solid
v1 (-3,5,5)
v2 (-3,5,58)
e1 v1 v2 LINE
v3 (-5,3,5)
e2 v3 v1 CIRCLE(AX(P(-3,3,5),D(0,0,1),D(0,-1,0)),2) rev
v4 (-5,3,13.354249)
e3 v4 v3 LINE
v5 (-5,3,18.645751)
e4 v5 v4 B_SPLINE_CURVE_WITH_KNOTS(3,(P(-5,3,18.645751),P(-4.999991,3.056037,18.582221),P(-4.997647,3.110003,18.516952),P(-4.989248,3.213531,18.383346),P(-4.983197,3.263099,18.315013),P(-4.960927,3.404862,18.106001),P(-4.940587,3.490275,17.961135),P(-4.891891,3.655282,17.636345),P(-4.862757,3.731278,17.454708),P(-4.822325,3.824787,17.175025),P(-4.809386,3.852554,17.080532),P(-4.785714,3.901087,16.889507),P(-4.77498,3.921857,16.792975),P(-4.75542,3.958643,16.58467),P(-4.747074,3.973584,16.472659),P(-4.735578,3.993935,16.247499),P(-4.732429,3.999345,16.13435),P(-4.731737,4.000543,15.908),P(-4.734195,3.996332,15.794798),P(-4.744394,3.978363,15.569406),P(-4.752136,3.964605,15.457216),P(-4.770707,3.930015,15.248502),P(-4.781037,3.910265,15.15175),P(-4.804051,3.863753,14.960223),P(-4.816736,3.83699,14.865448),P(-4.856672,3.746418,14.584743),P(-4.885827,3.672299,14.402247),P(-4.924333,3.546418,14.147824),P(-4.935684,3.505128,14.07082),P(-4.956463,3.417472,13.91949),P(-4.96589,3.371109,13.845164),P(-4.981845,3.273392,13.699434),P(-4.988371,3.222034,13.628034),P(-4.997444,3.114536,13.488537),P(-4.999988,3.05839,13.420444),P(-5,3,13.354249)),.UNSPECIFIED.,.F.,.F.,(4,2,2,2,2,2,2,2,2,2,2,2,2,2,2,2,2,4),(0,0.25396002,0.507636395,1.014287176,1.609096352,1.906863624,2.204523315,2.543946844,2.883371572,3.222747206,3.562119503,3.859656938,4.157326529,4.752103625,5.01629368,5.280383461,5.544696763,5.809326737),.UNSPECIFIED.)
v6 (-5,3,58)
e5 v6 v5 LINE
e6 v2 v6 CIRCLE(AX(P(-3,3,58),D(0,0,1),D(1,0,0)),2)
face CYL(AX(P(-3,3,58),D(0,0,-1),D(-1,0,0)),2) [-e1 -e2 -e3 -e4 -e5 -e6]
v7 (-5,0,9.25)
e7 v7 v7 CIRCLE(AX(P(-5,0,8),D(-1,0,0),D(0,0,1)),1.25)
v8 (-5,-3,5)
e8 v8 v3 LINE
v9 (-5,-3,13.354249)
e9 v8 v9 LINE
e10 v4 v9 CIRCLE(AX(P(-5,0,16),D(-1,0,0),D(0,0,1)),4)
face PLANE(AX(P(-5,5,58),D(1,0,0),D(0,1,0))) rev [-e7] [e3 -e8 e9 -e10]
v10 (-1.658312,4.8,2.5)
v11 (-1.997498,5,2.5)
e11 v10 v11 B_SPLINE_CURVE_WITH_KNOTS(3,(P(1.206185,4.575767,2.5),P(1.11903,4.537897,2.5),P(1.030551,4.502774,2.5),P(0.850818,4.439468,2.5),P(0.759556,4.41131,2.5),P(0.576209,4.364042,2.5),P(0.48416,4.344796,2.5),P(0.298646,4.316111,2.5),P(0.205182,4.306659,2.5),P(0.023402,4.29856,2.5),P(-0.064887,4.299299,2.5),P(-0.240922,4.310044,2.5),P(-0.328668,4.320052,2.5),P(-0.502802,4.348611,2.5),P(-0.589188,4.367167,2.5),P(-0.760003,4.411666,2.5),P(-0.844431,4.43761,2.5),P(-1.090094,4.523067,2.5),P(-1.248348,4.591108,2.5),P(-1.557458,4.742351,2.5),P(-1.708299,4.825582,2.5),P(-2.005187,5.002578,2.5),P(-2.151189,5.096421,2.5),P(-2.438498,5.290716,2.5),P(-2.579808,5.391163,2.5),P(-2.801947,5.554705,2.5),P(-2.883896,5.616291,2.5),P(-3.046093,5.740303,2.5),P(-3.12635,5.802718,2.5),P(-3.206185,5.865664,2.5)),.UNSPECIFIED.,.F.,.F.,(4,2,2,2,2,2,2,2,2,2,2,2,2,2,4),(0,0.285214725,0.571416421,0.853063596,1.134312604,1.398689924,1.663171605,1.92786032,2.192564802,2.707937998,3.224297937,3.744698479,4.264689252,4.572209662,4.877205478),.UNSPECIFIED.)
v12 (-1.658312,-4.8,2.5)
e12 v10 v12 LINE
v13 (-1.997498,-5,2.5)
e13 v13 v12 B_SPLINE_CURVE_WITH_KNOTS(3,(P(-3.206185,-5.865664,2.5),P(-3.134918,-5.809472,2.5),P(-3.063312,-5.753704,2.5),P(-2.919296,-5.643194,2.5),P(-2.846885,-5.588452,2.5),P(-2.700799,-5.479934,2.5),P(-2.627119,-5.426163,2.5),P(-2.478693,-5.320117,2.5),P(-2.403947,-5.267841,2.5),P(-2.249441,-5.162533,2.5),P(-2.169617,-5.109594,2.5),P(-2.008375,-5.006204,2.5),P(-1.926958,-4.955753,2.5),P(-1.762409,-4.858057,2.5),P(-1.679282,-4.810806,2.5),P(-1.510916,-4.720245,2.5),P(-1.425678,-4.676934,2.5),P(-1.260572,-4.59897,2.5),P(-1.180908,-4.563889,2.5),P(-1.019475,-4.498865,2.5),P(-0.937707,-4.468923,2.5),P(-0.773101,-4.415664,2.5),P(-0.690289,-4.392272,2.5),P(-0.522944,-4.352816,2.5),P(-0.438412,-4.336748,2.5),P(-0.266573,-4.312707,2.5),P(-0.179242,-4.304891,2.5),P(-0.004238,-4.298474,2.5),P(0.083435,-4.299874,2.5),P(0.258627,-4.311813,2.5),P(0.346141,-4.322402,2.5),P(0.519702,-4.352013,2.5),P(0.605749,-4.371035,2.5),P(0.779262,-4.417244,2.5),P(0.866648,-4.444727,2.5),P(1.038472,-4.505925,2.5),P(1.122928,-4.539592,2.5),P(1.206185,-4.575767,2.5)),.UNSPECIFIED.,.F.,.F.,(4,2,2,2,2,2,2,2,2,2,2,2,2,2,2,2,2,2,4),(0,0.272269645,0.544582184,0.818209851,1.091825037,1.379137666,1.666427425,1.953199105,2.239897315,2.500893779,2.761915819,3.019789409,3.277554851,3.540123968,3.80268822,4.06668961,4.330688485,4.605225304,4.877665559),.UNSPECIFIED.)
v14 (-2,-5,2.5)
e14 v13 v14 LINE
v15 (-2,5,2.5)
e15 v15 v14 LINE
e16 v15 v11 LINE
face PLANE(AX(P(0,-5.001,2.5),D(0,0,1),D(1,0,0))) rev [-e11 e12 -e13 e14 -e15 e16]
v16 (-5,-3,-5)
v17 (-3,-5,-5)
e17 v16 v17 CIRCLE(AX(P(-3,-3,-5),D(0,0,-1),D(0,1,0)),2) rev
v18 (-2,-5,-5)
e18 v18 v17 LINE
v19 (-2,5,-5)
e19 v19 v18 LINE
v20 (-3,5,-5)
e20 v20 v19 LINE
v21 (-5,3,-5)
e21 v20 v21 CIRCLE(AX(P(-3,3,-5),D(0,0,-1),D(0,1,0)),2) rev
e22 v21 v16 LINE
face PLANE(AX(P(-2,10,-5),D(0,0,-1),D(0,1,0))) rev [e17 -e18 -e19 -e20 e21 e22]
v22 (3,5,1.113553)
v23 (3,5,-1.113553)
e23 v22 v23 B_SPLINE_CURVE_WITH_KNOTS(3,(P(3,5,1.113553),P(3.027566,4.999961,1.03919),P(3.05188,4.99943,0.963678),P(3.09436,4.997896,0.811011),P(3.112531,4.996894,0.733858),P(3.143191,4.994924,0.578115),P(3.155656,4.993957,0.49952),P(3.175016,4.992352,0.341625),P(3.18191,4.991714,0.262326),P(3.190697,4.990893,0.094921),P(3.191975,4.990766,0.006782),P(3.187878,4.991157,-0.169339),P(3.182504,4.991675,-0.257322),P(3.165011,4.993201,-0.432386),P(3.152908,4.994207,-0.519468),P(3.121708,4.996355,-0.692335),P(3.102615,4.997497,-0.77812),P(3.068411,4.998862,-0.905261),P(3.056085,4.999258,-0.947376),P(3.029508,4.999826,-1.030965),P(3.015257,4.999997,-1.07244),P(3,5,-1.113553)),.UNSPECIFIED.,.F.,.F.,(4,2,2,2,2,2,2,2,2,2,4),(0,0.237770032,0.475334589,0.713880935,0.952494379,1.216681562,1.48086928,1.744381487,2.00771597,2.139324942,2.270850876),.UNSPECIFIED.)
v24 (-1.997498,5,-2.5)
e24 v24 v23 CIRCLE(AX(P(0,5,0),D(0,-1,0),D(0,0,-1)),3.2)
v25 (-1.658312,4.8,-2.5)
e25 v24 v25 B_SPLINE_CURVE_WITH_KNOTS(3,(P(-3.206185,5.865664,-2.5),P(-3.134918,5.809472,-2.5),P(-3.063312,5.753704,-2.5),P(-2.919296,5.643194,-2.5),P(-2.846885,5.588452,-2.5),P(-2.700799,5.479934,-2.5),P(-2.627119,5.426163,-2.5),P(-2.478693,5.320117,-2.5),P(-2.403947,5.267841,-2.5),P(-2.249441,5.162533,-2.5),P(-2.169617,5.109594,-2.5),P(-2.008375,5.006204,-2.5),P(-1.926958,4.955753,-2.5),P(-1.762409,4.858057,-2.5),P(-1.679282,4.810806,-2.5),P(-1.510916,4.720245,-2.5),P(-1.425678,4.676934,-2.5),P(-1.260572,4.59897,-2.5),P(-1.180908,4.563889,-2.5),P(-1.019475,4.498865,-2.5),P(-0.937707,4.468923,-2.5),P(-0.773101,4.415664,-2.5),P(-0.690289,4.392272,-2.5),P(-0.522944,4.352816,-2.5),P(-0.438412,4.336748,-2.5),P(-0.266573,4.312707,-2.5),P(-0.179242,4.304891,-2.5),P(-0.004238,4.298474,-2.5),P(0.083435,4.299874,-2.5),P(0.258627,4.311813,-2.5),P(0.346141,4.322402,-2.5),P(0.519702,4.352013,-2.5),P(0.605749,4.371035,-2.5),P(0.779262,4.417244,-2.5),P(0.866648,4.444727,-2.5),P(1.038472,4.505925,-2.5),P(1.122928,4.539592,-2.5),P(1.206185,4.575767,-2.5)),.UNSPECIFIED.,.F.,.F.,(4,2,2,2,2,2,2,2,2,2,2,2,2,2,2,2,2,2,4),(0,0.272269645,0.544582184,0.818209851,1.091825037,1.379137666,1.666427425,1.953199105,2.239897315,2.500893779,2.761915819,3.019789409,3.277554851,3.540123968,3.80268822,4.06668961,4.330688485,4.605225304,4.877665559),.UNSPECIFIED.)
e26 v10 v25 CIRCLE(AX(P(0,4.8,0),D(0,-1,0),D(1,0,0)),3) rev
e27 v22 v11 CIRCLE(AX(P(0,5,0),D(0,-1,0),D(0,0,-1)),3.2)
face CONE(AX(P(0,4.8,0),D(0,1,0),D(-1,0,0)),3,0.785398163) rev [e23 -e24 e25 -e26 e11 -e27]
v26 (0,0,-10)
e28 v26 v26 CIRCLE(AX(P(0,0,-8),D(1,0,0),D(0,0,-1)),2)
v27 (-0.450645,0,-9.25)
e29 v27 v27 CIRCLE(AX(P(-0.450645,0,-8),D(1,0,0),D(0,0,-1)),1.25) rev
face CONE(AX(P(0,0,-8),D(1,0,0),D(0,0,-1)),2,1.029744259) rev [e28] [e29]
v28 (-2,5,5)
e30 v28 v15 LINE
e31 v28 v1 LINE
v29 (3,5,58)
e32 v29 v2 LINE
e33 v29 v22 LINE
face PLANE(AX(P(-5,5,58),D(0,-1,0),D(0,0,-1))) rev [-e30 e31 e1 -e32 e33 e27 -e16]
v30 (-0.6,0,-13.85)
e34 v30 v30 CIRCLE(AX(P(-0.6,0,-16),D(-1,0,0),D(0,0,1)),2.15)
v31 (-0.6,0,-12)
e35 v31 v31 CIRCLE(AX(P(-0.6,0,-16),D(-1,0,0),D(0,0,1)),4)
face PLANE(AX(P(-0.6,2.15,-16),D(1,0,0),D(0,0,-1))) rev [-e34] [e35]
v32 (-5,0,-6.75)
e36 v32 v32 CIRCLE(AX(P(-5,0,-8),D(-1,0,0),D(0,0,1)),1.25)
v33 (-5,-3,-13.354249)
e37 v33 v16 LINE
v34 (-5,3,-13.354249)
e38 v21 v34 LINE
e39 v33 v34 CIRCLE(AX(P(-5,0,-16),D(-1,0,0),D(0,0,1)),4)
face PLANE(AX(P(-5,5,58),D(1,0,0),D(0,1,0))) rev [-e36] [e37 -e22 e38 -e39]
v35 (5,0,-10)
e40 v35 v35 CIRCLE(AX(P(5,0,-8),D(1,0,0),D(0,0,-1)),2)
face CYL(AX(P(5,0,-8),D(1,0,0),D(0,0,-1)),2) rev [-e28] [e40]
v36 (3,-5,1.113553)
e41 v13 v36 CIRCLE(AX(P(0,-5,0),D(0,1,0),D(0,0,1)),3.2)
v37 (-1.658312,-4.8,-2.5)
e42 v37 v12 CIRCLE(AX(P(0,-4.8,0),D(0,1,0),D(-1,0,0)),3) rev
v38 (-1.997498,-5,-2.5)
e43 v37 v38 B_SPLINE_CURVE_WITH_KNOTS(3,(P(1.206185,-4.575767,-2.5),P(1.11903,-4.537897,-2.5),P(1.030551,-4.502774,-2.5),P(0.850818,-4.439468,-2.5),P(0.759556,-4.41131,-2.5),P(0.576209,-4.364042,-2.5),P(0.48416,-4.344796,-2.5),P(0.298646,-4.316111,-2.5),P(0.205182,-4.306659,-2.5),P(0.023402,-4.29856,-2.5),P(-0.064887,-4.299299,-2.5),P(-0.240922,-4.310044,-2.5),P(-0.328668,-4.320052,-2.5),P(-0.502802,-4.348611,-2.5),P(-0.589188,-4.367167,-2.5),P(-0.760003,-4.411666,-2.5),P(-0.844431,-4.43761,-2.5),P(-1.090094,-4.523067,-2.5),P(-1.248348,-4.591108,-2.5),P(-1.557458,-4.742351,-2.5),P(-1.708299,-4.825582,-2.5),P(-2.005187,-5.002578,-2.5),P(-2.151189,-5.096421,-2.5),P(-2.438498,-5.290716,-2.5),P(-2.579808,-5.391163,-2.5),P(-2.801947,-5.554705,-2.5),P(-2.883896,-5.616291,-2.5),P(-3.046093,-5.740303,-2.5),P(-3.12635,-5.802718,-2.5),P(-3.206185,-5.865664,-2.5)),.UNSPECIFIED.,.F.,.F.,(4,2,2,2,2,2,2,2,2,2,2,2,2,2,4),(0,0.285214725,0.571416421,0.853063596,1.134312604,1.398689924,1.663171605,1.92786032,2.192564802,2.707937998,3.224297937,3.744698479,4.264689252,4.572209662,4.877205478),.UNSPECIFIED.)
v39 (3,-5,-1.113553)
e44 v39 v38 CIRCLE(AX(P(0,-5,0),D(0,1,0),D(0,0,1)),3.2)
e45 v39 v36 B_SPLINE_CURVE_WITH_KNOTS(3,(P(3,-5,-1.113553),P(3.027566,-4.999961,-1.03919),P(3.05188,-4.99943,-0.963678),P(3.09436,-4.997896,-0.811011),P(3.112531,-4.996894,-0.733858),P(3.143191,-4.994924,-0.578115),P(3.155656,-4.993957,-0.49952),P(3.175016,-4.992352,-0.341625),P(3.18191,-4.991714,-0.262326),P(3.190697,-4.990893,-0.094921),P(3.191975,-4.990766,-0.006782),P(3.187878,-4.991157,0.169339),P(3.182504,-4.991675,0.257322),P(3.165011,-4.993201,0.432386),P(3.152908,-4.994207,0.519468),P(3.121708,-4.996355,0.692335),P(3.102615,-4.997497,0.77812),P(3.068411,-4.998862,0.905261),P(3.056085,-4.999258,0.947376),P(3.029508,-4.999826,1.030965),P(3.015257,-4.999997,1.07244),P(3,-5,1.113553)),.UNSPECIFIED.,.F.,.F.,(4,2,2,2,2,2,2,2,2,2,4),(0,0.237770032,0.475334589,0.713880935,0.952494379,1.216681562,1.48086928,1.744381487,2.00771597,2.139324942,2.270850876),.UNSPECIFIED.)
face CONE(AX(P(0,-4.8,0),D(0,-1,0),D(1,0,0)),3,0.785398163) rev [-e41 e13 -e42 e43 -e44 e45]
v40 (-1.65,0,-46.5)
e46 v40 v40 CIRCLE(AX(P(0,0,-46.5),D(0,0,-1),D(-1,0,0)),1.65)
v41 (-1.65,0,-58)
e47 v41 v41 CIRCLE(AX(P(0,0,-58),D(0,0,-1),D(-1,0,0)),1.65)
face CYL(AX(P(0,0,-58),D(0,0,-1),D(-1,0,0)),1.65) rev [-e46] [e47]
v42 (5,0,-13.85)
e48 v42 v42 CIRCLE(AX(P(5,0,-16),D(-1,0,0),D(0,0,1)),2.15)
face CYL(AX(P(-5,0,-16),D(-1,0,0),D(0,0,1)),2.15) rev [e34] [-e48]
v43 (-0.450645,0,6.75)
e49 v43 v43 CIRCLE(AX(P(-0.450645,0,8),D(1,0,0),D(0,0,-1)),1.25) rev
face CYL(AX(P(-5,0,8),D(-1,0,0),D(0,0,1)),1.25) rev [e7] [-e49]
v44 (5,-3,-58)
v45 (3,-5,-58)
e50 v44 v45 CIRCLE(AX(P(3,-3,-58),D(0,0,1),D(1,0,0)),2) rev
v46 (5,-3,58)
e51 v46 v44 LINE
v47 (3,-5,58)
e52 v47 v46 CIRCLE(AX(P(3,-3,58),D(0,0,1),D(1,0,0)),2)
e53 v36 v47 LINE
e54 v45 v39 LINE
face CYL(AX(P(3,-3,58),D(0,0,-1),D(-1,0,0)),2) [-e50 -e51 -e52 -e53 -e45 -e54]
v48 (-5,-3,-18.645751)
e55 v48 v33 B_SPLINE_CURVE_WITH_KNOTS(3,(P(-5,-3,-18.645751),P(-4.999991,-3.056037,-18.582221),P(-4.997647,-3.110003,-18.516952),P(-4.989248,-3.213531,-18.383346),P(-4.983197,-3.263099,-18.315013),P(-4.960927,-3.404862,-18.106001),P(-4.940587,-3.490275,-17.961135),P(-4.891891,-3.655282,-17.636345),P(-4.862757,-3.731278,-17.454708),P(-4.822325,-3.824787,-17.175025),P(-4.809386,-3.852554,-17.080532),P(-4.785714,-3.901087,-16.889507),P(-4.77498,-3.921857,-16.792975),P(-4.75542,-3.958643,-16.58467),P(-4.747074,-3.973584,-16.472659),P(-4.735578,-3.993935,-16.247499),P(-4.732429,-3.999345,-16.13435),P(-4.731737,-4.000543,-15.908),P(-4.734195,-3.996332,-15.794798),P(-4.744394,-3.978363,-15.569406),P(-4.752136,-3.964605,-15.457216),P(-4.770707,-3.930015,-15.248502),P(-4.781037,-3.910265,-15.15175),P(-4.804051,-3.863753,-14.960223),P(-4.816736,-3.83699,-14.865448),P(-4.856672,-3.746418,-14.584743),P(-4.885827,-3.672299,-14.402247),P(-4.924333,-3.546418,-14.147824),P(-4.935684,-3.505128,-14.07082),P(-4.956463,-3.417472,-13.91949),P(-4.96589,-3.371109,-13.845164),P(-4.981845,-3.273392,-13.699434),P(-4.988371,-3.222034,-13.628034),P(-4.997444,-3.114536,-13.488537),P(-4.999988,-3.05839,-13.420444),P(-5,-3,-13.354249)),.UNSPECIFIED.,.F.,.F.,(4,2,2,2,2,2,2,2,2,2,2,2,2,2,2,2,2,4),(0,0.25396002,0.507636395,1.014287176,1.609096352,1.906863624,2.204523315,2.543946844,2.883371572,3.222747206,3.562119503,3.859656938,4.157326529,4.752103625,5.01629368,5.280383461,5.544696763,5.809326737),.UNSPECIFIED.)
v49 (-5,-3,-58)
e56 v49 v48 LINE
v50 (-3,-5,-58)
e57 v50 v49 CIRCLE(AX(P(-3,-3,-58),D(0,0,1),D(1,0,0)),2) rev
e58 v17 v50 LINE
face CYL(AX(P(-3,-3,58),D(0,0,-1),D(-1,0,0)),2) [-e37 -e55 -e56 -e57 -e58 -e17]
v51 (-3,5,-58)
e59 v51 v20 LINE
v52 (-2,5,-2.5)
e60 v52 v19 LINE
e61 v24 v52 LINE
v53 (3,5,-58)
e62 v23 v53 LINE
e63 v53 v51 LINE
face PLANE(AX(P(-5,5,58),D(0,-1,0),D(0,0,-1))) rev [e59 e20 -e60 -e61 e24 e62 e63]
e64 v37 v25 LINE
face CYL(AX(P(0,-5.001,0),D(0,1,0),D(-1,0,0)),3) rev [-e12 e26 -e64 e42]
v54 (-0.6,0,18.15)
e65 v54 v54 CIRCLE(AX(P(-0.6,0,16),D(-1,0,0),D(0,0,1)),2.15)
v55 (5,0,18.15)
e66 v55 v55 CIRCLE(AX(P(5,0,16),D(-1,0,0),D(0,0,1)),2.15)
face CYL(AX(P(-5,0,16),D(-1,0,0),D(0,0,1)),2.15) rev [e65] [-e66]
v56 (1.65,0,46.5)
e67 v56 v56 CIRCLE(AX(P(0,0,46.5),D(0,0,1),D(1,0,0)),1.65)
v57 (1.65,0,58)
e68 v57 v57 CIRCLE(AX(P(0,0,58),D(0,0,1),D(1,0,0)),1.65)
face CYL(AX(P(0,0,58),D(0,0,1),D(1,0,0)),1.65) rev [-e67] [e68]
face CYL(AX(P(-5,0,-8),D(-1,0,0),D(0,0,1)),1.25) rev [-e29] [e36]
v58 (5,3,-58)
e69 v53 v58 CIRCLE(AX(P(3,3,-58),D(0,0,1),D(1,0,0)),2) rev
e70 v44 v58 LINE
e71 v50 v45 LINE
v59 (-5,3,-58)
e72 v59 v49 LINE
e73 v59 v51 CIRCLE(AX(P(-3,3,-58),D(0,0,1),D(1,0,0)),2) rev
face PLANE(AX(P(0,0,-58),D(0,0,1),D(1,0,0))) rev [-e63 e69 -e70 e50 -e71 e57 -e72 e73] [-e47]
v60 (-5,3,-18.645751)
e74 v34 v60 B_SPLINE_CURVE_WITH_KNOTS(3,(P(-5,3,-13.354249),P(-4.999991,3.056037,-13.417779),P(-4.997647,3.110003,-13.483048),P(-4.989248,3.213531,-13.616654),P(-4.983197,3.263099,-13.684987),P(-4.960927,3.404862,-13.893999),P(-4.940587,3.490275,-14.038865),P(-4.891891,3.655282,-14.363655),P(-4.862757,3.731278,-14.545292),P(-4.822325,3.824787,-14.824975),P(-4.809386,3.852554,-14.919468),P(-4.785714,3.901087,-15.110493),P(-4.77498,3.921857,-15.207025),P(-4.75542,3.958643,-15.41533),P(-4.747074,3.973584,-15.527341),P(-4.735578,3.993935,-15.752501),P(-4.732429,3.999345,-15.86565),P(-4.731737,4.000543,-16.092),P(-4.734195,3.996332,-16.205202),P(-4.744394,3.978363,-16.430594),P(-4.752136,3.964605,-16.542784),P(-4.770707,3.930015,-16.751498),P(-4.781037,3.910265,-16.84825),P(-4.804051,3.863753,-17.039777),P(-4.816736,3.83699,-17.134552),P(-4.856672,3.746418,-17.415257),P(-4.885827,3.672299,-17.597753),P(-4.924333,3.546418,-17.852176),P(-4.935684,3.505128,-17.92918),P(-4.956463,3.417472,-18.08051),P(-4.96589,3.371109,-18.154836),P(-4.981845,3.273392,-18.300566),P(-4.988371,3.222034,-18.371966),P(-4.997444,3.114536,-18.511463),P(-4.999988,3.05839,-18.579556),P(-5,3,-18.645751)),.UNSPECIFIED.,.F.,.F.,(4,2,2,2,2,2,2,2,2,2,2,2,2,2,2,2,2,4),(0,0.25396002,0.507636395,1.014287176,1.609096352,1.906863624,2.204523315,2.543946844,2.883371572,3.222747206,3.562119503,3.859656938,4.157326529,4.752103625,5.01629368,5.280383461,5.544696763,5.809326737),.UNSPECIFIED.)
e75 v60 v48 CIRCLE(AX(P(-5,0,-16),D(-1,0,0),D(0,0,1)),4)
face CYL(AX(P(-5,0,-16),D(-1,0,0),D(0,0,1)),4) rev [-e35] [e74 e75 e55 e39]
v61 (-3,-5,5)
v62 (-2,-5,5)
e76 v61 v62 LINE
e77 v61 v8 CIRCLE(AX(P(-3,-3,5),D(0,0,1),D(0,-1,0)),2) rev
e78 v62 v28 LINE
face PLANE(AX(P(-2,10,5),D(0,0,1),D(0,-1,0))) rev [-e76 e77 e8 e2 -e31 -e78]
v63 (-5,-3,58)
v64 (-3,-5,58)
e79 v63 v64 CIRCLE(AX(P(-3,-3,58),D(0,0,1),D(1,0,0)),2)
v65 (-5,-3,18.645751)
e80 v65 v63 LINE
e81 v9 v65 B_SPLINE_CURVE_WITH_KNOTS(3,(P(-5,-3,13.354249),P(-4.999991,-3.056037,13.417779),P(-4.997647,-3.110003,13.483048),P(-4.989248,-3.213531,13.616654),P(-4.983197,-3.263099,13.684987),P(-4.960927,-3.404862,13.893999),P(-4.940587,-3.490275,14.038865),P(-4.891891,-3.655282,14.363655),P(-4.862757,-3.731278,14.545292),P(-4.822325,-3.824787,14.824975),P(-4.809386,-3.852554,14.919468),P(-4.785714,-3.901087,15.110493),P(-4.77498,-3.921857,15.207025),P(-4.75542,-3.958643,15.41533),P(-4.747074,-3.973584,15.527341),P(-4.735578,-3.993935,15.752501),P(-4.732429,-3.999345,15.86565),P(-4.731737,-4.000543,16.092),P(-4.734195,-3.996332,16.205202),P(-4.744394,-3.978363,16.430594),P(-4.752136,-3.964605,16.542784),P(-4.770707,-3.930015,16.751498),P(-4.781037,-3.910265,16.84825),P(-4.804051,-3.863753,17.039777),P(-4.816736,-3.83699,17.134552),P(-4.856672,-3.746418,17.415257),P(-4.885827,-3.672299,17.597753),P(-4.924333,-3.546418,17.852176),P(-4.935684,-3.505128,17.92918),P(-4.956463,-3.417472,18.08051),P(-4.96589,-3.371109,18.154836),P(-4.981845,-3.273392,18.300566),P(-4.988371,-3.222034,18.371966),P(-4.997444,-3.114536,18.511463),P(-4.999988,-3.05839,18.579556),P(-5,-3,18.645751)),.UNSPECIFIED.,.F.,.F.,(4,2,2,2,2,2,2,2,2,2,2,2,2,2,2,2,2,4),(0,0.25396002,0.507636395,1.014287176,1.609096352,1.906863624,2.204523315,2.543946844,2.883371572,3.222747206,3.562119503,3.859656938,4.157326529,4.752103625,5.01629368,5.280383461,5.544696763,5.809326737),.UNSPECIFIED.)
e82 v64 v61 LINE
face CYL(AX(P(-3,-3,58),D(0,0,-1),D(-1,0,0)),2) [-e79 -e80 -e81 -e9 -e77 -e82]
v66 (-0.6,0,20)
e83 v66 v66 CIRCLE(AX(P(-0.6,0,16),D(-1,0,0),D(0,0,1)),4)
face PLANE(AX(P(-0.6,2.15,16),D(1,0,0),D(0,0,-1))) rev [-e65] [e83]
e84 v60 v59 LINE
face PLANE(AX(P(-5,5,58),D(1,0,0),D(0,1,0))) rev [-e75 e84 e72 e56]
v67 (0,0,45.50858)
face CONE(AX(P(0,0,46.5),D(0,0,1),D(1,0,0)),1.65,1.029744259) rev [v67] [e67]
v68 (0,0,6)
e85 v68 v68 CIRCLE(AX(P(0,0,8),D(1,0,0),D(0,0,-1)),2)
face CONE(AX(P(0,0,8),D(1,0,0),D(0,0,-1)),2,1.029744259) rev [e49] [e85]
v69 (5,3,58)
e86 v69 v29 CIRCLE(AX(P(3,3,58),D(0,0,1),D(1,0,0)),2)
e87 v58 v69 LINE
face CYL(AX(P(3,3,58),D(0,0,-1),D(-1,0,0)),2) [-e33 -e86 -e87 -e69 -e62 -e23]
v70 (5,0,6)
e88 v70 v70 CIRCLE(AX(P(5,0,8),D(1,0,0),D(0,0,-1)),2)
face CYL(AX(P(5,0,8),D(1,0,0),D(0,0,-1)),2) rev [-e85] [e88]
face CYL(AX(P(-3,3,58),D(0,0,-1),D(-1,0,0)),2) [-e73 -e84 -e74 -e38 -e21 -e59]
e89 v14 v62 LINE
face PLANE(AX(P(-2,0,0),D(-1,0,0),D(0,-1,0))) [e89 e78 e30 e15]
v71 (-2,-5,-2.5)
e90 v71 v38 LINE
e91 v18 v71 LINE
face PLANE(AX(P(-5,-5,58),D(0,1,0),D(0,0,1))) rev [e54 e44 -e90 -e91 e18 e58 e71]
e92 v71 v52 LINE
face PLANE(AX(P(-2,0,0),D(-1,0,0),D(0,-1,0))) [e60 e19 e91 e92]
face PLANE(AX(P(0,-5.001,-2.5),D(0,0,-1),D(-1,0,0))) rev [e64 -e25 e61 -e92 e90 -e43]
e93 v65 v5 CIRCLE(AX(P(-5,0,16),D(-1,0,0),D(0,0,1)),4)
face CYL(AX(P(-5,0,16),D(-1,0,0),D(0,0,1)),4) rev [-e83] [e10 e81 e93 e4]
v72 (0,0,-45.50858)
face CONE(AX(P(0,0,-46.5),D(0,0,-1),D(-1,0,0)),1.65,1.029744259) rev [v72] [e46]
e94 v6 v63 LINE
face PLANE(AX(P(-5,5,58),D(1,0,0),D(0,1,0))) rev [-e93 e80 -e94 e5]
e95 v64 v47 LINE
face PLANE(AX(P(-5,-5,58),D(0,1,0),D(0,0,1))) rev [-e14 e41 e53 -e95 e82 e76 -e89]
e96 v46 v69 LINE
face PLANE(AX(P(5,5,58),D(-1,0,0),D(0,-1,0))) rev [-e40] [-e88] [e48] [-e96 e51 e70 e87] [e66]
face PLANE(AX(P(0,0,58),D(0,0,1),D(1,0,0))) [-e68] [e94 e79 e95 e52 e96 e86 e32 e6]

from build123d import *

# Parameters (mm, degrees)
ESQUISSE1_W                                        = 10
ESQUISSE1_H                                        = 10
BOSS_EXTRU_1_DEPTH                                 = 58
ENL_V_MAT_EXTRU_2_REACH                            = 61.068
ESQUISSE12_R                                       = 3
CHANFREIN1_SIZE                                    = 0.2
CONG_1_R                                           = 2
TROU_TARAUD_M41_D                                  = 3.3
TROU_TARAUD_M41_DEPTH                              = 11.5
TROU_TARAUD_M41_TIP                                = 0.991420021
TROU_TARAUD_M42_D                                  = 3.3
TROU_TARAUD_M42_DEPTH                              = 11.5
TROU_TARAUD_M42_TIP                                = 0.991420021
DIAM_TRE_DU_PER_AGE_4_0_4_1_D                      = 4
DIAM_TRE_DU_PER_AGE_4_0_4_1_DEPTH                  = 5
DIAM_TRE_DU_PER_AGE_4_0_4_1_TIP                    = 1.201721238
CHAMBRAGE_POUR_VIS_T_TE_HEXAGONALE_M41_D           = 4.3
CHAMBRAGE_POUR_VIS_T_TE_HEXAGONALE_M41_CBORE_D     = 8
CHAMBRAGE_POUR_VIS_T_TE_HEXAGONALE_M41_CBORE_DEPTH = 4.4
TROU_TARAUD_M31_D                                  = 2.5
TROU_TARAUD_M31_DEPTH                              = 8.5
TROU_TARAUD_M31_TIP                                = 0.751075774
ESQUISSE25_W                                       = 10
ESQUISSE25_H                                       = 20
ENL_V_MAT_EXTRU_4_DEPTH                            = 3
CASSER_START                                       = -10
ESQUISSE26_W                                       = 5
ESQUISSE26_H                                       = 5
CASSER_ANGLE_DEPTH                                 = 10


with BuildPart() as part:
    # Esquisse1 → Boss.-Extru.1 (new, symmetric)
    with BuildSketch(Plane.XY):
        Rectangle(ESQUISSE1_W, ESQUISSE1_H)
    extrude(amount=BOSS_EXTRU_1_DEPTH, both=True)

    # Esquisse12 → Enlèv. mat.-Extru.2 (cut, up to next)
    with BuildSketch(Plane(origin=(0, 5, 0), x_dir=(1, 0, 0), z_dir=(0, 1, 0)), mode=Mode.PRIVATE) as enl_v_mat_extru_2_sk1:
        with Locations(Location((0, 0, 0), (0, 0, 180))):
            Circle(ESQUISSE12_R)
    enl_v_mat_extru_2_tool1 = extrude(enl_v_mat_extru_2_sk1.sketch, amount=-ENL_V_MAT_EXTRU_2_REACH, mode=Mode.PRIVATE) & part.part
    add(enl_v_mat_extru_2_tool1.solids().sort_by_distance((0, 5, 0))[0], mode=Mode.SUBTRACT)

    # Chanfrein1
    chanfrein1_edges = [part.edges().sort_by_distance(p)[0] for p in [
        (3, 5, 0),
        (3, -5, 0),
    ]]
    chamfer(chanfrein1_edges, length=CHANFREIN1_SIZE)

    # Congé1
    # the kernel refuses this fillet: 2 mm, written as the material it takes off along each edge
    with BuildSketch(Plane(origin=(-5, 5, -63), x_dir=(1, 0, 0), z_dir=(0, 0, 1)), Plane(origin=(5, 5, 63), x_dir=(-1, 0, 0), z_dir=(0, 0, -1)), Plane(origin=(5, -5, 63), x_dir=(0, 1, 0), z_dir=(0, 0, -1)), Plane(origin=(-5, -5, -63), x_dir=(0, 1, 0), z_dir=(0, 0, 1))) as cong_1_piece_1:
        with BuildLine():
            CenterArc((CONG_1_R, -CONG_1_R), CONG_1_R, 90, 90)
            Line((0, -CONG_1_R), (0, 0))
            Line((0, 0), (CONG_1_R, 0))
        make_face()
    extrude(amount=126, mode=Mode.SUBTRACT)

    # Trou taraudé M41
    with Locations(Plane.XY.offset(58)):
        with Locations((0, 0)):
            Hole(TROU_TARAUD_M41_D / 2, depth=TROU_TARAUD_M41_DEPTH)
            with Locations((0, 0, -(TROU_TARAUD_M41_DEPTH + TROU_TARAUD_M41_TIP / 2))):  # 118° drill point
                Cone(0, TROU_TARAUD_M41_D / 2, TROU_TARAUD_M41_TIP, mode=Mode.SUBTRACT)

    # Trou taraudé M42
    with Locations(Plane(origin=(0, 0, -58), x_dir=(-1, 0, 0), z_dir=(0, 0, -1))):
        with Locations((0, 0)):
            Hole(TROU_TARAUD_M42_D / 2, depth=TROU_TARAUD_M42_DEPTH)
            with Locations((0, 0, -(TROU_TARAUD_M42_DEPTH + TROU_TARAUD_M42_TIP / 2))):  # 118° drill point
                Cone(0, TROU_TARAUD_M42_D / 2, TROU_TARAUD_M42_TIP, mode=Mode.SUBTRACT)

    # Diamètre du perçage Ø4.0 (4)1
    with Locations(Plane(origin=(5, 0, 0), x_dir=(0, 0, -1), z_dir=(1, 0, 0))):
        with Locations((8, 0), (-8, 0)):
            Hole(DIAM_TRE_DU_PER_AGE_4_0_4_1_D / 2, depth=DIAM_TRE_DU_PER_AGE_4_0_4_1_DEPTH)
            with Locations((0, 0, -(DIAM_TRE_DU_PER_AGE_4_0_4_1_DEPTH + DIAM_TRE_DU_PER_AGE_4_0_4_1_TIP / 2))):  # 118° drill point
                Cone(0, DIAM_TRE_DU_PER_AGE_4_0_4_1_D / 2, DIAM_TRE_DU_PER_AGE_4_0_4_1_TIP, mode=Mode.SUBTRACT)

    # Chambrage pour vis à tête hexagonale M41 (through all)
    with Locations(Plane.ZY.offset(5)):
        with Locations((-16, 0), (16, 0)):
            CounterBoreHole(CHAMBRAGE_POUR_VIS_T_TE_HEXAGONALE_M41_D / 2, CHAMBRAGE_POUR_VIS_T_TE_HEXAGONALE_M41_CBORE_D / 2, CHAMBRAGE_POUR_VIS_T_TE_HEXAGONALE_M41_CBORE_DEPTH)

    # Trou taraudé M31
    with Locations(Plane.ZY.offset(5)):
        with Locations((-8, 0), (8, 0)):
            Hole(TROU_TARAUD_M31_D / 2, depth=TROU_TARAUD_M31_DEPTH)
            with Locations((0, 0, -(TROU_TARAUD_M31_DEPTH + TROU_TARAUD_M31_TIP / 2))):  # 118° drill point
                Cone(0, TROU_TARAUD_M31_D / 2, TROU_TARAUD_M31_TIP, mode=Mode.SUBTRACT)

    # Esquisse25 → Enlèv. mat.-Extru.4 (cut)
    with BuildSketch(Plane.ZY.offset(5)):
        Rectangle(ESQUISSE25_W, ESQUISSE25_H)
    extrude(amount=-ENL_V_MAT_EXTRU_4_DEPTH, mode=Mode.SUBTRACT)

    # Esquisse26 → Casser Angle (cut)
    with BuildSketch(Plane(origin=(0, 5, 0), x_dir=(1, 0, 0), z_dir=(0, 1, 0)).offset(CASSER_START)):
        with Locations((-2.5, 0)):
            Rectangle(ESQUISSE26_W, ESQUISSE26_H)
    extrude(amount=CASSER_ANGLE_DEPTH, mode=Mode.SUBTRACT)


solid = part.part
